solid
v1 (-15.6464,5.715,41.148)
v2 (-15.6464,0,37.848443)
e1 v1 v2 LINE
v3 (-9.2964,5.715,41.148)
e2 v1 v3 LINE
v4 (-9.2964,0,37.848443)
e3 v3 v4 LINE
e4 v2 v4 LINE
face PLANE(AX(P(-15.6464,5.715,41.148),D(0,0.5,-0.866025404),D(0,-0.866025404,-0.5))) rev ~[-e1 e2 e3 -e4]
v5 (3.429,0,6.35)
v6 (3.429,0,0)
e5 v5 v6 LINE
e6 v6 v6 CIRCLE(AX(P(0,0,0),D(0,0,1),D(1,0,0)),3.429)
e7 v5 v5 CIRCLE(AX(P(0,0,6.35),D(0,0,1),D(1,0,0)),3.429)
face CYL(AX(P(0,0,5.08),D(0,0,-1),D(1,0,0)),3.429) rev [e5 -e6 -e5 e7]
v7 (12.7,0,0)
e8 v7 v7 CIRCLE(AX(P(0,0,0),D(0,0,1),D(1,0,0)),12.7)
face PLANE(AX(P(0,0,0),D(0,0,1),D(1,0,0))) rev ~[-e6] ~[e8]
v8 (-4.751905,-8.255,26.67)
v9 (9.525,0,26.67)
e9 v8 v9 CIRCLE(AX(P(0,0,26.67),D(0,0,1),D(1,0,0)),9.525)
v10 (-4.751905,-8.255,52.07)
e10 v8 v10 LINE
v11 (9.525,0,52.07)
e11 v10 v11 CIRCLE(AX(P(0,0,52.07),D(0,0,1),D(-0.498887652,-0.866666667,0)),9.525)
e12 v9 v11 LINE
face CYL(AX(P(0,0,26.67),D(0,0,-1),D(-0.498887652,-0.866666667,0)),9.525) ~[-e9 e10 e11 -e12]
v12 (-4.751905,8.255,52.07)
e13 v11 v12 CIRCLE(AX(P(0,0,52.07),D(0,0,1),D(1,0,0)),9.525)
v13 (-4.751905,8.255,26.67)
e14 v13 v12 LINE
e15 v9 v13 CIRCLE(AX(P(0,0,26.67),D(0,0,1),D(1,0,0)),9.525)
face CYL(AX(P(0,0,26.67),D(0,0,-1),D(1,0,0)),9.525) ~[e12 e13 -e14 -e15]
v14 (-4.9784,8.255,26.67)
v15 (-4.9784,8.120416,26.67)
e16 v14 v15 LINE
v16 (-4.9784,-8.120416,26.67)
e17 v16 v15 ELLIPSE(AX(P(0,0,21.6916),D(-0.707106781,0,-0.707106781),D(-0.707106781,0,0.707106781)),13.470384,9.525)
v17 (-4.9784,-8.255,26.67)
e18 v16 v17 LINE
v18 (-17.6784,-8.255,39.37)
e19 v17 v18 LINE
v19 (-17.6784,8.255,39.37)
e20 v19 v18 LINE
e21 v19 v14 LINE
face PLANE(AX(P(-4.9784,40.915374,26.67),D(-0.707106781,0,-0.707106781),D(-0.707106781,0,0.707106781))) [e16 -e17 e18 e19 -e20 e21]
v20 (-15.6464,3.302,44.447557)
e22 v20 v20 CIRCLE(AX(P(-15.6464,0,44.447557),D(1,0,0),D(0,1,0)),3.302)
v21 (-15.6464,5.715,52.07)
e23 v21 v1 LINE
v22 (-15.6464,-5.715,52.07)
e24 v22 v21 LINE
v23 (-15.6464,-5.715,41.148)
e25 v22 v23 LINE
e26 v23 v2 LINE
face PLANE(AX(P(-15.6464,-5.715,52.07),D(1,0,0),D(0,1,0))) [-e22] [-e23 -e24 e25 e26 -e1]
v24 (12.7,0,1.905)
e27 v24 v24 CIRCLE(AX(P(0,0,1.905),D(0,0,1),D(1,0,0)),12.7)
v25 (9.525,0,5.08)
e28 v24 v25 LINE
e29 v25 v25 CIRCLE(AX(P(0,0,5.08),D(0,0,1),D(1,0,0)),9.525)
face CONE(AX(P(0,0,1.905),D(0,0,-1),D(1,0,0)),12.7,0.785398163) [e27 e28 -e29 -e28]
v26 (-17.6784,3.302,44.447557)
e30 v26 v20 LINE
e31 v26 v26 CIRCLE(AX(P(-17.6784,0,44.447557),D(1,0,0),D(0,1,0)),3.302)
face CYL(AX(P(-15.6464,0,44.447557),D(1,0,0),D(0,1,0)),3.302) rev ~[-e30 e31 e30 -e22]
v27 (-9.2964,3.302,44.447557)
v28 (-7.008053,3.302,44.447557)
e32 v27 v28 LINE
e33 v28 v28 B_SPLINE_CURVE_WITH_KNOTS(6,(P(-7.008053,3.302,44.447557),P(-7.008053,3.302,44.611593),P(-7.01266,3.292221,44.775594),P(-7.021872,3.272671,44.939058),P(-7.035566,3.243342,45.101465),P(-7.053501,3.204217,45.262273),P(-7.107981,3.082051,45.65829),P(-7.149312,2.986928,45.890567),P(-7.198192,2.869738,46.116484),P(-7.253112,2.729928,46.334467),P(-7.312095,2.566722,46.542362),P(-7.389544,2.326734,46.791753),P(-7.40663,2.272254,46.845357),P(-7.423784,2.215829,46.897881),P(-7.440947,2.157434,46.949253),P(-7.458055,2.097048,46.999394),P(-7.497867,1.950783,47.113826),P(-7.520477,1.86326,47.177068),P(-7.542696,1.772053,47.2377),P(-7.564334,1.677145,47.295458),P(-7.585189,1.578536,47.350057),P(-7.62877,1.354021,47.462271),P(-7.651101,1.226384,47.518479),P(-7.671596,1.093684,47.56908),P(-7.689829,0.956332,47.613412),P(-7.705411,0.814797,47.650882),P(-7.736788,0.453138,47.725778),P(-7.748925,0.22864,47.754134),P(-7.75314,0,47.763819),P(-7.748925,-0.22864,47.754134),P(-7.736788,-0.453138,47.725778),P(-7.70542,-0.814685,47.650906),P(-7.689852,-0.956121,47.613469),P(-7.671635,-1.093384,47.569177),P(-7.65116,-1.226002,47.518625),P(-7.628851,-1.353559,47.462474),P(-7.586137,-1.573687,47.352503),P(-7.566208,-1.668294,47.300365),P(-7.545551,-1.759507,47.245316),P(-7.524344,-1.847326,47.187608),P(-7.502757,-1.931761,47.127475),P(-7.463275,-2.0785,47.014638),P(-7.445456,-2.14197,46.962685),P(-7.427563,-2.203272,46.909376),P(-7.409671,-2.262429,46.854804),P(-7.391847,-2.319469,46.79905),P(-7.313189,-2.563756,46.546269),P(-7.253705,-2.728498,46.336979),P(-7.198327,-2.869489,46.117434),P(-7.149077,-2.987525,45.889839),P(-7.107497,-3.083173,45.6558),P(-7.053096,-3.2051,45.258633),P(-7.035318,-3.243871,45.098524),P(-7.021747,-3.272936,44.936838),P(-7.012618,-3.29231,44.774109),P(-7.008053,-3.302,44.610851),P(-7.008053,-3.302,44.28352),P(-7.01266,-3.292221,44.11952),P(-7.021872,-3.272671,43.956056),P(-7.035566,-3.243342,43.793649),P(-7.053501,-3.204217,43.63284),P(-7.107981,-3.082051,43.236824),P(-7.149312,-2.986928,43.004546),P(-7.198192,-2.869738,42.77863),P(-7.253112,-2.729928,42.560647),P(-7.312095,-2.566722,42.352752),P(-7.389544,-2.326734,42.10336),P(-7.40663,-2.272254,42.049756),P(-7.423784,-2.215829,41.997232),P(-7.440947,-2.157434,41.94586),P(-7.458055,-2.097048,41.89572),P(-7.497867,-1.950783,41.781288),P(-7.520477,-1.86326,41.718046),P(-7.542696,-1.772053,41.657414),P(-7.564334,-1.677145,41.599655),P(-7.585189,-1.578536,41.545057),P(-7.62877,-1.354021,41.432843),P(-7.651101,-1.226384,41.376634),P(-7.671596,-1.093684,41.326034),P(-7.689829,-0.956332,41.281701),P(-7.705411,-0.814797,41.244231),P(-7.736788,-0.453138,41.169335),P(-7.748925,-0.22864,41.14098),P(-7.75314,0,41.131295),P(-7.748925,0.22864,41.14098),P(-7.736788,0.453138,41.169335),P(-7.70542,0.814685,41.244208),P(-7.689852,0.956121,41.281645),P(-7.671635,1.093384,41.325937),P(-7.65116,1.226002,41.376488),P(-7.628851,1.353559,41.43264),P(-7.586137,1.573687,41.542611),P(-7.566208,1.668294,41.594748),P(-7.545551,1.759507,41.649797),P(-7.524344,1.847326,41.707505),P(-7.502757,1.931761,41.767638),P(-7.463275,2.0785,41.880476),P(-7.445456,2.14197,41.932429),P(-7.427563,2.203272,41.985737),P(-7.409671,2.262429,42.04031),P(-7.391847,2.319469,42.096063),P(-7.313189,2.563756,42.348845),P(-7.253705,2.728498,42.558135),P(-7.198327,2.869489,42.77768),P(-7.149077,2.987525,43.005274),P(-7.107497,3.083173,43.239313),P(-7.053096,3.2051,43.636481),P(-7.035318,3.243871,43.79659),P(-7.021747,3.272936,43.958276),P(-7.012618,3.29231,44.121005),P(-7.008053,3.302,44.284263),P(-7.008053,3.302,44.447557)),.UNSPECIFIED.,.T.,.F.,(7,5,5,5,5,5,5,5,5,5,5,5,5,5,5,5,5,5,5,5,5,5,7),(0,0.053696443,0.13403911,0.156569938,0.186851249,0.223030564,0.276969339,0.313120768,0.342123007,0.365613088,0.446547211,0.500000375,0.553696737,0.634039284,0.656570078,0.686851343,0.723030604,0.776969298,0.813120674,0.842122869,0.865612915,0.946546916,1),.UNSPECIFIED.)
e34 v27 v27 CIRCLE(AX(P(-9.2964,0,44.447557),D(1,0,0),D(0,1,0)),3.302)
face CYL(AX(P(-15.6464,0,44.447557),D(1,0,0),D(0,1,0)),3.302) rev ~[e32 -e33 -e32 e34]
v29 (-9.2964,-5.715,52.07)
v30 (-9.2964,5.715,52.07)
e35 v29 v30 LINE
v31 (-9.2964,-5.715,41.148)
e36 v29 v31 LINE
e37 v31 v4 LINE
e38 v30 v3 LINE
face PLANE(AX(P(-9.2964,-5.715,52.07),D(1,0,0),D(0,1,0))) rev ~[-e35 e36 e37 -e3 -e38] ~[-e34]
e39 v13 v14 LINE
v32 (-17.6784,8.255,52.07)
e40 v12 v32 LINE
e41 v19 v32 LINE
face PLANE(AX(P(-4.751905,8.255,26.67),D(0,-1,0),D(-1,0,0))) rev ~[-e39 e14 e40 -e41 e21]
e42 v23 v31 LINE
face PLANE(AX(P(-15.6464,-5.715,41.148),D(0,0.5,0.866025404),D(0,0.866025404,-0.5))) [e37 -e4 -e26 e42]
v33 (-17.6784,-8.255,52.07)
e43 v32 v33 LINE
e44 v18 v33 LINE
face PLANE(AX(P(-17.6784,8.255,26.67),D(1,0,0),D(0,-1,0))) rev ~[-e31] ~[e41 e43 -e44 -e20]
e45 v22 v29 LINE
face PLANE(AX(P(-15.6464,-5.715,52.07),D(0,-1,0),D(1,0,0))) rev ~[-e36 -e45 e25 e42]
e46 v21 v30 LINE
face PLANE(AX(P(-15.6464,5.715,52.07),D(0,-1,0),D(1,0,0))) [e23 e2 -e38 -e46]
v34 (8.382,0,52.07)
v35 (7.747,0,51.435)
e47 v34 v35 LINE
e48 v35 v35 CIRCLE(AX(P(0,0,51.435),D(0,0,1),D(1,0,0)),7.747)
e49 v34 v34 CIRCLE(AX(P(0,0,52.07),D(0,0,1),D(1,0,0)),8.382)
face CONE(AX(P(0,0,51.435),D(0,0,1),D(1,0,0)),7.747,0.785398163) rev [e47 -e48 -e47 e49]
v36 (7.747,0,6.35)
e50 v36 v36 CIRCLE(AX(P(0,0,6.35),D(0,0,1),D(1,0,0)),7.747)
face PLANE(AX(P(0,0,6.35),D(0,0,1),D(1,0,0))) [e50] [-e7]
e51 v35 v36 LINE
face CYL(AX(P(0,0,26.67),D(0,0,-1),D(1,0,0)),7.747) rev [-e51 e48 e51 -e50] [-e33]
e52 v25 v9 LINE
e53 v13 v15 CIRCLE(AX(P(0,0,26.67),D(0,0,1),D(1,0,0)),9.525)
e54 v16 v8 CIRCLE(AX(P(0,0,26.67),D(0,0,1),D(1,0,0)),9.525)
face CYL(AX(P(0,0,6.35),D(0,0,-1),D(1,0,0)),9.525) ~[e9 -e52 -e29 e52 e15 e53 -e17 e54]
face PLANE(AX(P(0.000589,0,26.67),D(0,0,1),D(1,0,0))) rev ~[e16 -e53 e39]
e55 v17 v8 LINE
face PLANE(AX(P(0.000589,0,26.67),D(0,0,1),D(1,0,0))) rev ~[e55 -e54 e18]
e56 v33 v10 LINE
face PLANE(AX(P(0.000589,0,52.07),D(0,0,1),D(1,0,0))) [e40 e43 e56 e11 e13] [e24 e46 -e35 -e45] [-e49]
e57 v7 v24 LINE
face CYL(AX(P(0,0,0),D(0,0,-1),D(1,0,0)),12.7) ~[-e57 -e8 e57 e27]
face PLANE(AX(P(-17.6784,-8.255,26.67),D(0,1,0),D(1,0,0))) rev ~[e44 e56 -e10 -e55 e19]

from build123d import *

# Parameters (mm, degrees)
F0_R         = 12.7
F0_R_2       = 3.429
F1_DEPTH     = 5.08
F2_SIZE      = 3.175
F3_DEPTH     = 1.27
F4_R         = 9.525
F4_R_2       = 7.747
F5_DEPTH     = 20.32
F6_R         = 7.747
F7_DEPTH     = 25.4
F8_T4_DEPTH  = 81.8307478943
F8_S5_R      = 9.525
F8_T6_DEPTH  = 43
F9_W         = 6.35
F9_H         = 11.43
F10_DEPTH    = 14.224
F11_T1_DEPTH = 6.35
F12_R        = 3.302
F13_DEPTH    = 12.7
F14_SIZE     = 0.635


# Not quite as in the source:
# - a fillet or chamfer that OpenCascade refuses, or shapes differently, is made with other operations: its cross-section is extruded or revolved along the edge and cut away or added


with BuildPart() as f1:
    # F0 (on Top) → F1 (new body)
    with BuildSketch(Plane.XY):
        Circle(F0_R)
        Circle(F0_R_2, mode=Mode.SUBTRACT)
    extrude(amount=F1_DEPTH)

    # F2
    f2_edges = [f1.edges().sort_by_distance(p)[0] for p in [
        (-12.7, 0, 5.08),
    ]]
    chamfer(f2_edges, length=F2_SIZE)

    # F3 (add): a face of the model
    f3_faces = [f1.faces().sort_by_distance(p)[0] for p in [
        (-9.2555923164, 0, 5.08),
    ]]
    extrude(f3_faces, amount=F3_DEPTH)

    # F4 (on face) → F5 (join)
    with BuildSketch(Plane.XY.offset(6.35)):
        Circle(F4_R)
        Circle(F4_R_2, mode=Mode.SUBTRACT)
    extrude(amount=F5_DEPTH)

    # F6 (on face) → F7 (join)
    with BuildSketch(Plane.XY.offset(26.67)):
        with BuildLine():
            ThreePointArc((9.525, 0), (4.7677946163, 8.2458328565), (-4.7519048812, 8.255))
            ThreePointArc((-4.7519048812, 8.255), (-9.525, 0), (-4.7519048812, -8.255))
            ThreePointArc((-4.7519048812, -8.255), (4.7677946163, -8.2458328565), (9.525, 0))
        make_face()
        Circle(F6_R, mode=Mode.SUBTRACT)
        with BuildLine():
            ThreePointArc((-4.7519048812, -8.255), (-9.525, 0), (-4.7519048812, 8.255))
            Line((-4.7519048812, 8.255), (-17.6784, 8.255))
            Line((-17.6784, 8.255), (-17.6784, -8.255))
            Line((-17.6784, -8.255), (-4.7519048812, -8.255))
        make_face()
    extrude(amount=F7_DEPTH)

    # F8: chamfer of 12.7 on 1 edges, made by hand


with BuildPart() as f8_tool2:
    # F8_s3 → F8_t4 (new body)
    with BuildSketch(Plane.XZ.offset(-40.9153739472)):
        Polygon((-4.9784, 26.67), (-17.6784, 39.37), (-17.6784, 26.67), align=None)
    extrude(amount=F8_T4_DEPTH)

    # F8_s5 → F8_t6 (cut, symmetric)
    with BuildSketch(Plane.XY.offset(33)):
        Circle(F8_S5_R)
    extrude(amount=F8_T6_DEPTH, both=True, mode=Mode.SUBTRACT)


with BuildPart() as f1_1:
    add(f1.part)

    # F8_t1: cut F8_tool2
    add(f8_tool2.part, mode=Mode.SUBTRACT)

    # F9 (on face) → F10 (cut)
    with BuildSketch(Plane.XY.offset(52.07)):
        with Locations((-12.4714, 0)):
            Rectangle(F9_W, F9_H)
    extrude(amount=-F10_DEPTH, mode=Mode.SUBTRACT)

    # F11: chamfer of 3.302 x 5.7192317666 on 2 edges, made by hand

    # F11_s2 → F11_t1 (join)
    with BuildSketch(Plane.YZ.offset(-15.6464)):
        Polygon((5.715, 41.148), (-0.0042317666, 37.846), (5.715, 37.846), align=None)
        Polygon((-5.715, 41.148), (0.0042317666, 37.846), (-5.715, 37.846), align=None)
    extrude(amount=F11_T1_DEPTH)

    # F12 (on face) → F13 (cut, symmetric)
    with BuildSketch(Plane.YZ.offset(-15.6464)):
        with Locations((0, 44.4475567884)):
            Circle(F12_R)
    extrude(amount=F13_DEPTH, both=True, mode=Mode.SUBTRACT)

    # F14
    f14_edges = [f1_1.edges().sort_by_distance(p)[0] for p in [
        (-7.747, 0, 52.07),
    ]]
    chamfer(f14_edges, length=F14_SIZE)


solid = f1_1.part
